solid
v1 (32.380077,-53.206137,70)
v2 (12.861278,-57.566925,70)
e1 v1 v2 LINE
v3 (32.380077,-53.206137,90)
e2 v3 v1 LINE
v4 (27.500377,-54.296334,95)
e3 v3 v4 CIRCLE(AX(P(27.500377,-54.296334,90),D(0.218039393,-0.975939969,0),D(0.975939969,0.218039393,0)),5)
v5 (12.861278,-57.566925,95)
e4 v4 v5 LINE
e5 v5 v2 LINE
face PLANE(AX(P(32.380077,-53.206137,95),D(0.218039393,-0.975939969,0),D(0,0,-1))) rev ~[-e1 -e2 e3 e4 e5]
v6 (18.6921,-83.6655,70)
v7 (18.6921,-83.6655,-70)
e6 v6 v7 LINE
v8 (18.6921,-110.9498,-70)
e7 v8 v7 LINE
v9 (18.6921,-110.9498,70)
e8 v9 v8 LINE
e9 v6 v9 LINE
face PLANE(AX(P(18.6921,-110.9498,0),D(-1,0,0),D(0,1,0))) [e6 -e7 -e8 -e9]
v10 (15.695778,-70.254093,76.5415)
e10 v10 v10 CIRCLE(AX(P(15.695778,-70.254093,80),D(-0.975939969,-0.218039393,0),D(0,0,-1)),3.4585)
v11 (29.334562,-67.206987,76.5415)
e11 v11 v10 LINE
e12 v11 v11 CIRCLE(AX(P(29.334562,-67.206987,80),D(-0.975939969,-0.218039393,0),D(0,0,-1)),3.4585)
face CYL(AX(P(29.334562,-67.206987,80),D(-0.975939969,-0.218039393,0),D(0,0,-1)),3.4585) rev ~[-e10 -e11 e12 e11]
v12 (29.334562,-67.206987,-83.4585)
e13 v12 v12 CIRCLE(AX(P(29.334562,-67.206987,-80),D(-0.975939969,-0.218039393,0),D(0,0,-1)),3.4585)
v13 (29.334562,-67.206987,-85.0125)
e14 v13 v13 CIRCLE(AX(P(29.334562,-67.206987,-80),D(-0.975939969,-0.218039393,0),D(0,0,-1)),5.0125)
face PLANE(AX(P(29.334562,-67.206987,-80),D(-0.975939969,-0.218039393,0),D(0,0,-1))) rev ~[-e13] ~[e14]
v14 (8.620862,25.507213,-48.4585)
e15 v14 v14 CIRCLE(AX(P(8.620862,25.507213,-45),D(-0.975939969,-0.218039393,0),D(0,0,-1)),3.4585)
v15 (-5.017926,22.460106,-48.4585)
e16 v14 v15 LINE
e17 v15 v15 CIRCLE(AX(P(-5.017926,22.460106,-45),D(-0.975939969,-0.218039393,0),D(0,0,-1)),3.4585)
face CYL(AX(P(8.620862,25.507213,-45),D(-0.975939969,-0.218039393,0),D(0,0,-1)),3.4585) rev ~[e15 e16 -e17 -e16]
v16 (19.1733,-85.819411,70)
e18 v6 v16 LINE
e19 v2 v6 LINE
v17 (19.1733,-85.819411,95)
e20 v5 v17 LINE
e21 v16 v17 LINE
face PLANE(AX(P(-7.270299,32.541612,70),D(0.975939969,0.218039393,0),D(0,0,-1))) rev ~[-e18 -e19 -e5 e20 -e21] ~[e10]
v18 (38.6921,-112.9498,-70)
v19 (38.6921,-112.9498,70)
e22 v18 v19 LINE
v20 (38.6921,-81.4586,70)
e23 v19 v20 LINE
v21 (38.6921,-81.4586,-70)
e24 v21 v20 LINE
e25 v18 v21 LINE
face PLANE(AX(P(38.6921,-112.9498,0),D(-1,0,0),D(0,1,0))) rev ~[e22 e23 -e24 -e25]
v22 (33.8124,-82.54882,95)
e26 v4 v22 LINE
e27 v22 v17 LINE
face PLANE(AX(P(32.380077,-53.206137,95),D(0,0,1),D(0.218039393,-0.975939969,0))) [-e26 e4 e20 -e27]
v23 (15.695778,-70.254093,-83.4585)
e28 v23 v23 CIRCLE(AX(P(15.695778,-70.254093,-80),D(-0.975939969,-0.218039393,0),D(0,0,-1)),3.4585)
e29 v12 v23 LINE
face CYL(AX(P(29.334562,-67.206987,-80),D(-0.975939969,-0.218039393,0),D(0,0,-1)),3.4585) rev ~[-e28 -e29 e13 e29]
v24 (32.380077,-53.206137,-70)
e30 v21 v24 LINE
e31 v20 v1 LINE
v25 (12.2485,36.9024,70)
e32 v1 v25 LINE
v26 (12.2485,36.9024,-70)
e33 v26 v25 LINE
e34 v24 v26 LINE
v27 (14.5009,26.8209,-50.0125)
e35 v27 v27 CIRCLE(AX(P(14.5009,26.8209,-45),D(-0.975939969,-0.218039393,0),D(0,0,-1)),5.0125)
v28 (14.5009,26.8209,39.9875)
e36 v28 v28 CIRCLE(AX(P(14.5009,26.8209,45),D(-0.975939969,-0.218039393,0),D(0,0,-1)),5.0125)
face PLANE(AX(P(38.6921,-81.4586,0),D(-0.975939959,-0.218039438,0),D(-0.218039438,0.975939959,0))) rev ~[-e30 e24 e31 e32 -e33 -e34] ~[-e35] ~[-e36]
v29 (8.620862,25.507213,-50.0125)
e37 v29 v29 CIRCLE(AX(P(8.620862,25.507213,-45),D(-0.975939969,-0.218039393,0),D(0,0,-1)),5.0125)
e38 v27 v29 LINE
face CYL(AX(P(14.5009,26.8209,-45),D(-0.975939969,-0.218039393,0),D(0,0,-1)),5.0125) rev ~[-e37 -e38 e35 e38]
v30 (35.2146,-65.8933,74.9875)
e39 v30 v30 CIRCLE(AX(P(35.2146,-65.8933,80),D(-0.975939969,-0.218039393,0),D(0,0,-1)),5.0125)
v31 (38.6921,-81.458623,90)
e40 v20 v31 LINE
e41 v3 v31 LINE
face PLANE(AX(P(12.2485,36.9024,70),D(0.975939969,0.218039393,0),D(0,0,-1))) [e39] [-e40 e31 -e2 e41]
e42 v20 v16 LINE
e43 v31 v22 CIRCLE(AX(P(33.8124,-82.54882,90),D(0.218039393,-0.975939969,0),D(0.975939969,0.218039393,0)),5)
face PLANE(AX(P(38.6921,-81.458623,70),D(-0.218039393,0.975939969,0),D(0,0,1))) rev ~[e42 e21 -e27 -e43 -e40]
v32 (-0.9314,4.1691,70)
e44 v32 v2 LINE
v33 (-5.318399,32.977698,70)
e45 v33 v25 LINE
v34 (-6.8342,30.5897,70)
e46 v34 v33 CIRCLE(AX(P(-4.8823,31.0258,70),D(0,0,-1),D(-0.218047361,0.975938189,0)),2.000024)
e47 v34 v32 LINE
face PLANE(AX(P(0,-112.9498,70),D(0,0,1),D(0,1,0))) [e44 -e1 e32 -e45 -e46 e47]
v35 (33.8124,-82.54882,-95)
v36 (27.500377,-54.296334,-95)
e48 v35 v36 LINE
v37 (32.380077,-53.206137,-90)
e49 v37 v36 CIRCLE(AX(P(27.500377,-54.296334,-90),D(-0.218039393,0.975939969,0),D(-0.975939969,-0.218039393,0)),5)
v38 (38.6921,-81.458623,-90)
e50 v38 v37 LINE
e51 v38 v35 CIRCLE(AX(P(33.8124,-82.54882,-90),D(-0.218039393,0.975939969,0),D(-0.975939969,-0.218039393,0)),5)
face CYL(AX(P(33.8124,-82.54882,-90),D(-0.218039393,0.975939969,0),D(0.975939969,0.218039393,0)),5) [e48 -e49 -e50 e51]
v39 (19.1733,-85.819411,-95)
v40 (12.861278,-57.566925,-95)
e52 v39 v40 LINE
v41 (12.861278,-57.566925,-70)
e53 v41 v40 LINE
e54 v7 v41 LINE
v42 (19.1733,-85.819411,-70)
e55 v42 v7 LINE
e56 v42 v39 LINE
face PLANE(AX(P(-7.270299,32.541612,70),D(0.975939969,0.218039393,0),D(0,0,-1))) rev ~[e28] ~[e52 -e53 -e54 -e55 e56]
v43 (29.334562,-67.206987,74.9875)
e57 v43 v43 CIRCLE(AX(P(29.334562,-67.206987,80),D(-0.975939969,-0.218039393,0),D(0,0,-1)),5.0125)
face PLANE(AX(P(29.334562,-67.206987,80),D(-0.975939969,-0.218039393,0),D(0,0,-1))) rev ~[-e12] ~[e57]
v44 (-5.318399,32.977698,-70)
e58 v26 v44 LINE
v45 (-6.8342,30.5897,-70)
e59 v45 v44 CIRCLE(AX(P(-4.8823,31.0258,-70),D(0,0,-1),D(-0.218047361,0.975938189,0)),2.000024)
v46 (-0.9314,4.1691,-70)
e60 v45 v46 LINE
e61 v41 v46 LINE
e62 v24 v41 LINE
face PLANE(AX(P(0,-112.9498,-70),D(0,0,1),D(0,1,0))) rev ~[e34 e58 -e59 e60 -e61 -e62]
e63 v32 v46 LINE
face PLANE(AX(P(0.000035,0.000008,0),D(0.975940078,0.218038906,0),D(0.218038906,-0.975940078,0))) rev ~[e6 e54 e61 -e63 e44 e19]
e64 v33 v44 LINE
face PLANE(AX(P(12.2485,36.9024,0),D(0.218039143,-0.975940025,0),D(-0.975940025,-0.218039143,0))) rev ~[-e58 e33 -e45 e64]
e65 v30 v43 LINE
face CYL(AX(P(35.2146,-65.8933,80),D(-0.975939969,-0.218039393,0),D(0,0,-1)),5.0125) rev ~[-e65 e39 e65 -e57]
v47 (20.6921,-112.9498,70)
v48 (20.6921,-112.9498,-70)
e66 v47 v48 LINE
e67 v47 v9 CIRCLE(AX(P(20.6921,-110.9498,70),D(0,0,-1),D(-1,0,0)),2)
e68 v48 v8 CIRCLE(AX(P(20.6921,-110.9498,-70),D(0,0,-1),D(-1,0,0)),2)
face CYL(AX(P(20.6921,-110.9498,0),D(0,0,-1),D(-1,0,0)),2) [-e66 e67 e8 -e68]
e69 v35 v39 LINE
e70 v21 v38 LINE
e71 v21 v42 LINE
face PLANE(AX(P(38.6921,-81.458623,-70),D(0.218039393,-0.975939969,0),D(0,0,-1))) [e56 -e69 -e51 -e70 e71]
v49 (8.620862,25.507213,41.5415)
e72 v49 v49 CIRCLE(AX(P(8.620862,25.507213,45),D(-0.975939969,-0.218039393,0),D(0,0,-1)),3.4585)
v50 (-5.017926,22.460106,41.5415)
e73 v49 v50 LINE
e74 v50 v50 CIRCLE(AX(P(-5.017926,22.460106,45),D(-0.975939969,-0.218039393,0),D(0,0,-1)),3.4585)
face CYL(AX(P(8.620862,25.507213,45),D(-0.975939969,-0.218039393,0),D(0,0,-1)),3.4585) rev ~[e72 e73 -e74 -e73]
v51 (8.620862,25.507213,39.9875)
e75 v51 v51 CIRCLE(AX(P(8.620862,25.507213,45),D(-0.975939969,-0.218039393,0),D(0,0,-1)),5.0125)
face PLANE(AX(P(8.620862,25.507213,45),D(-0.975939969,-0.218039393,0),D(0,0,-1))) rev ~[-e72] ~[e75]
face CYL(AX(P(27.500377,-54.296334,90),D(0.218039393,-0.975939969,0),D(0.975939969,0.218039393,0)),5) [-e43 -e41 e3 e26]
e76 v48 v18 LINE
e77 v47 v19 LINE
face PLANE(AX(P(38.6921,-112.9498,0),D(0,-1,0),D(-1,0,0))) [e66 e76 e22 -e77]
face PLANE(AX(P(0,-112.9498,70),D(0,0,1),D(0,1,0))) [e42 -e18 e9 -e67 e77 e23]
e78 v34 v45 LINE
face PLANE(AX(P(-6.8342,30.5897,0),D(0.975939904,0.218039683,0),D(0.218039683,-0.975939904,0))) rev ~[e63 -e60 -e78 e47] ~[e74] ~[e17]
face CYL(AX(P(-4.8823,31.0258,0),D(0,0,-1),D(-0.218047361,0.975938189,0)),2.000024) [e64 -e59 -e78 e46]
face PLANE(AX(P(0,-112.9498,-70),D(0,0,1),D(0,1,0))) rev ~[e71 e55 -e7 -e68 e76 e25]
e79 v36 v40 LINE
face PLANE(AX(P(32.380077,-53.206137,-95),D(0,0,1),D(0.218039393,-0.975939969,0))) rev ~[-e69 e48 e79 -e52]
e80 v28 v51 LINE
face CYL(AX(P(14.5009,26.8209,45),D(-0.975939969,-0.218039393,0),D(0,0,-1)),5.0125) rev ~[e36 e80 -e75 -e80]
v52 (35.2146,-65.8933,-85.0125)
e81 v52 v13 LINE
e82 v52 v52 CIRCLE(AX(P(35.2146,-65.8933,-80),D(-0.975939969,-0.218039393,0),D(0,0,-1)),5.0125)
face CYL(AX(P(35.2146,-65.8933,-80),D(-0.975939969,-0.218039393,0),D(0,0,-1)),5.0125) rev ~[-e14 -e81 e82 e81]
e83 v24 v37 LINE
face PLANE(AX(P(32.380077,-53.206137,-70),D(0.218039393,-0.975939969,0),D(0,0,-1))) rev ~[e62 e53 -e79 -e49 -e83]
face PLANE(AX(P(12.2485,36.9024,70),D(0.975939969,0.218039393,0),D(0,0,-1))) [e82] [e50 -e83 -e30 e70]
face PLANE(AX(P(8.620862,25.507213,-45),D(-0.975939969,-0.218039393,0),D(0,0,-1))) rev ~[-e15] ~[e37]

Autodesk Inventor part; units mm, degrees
ref_plane "YZ Plane" through (0, 0, 0) normal (1, 0, 0) x (0, 1, 0)
ref_plane "XZ Plane" through (0, 0, 0) normal (0, 1, 0) x (-1, 0, 0)
ref_plane "XY Plane" through (0, 0, 0) normal (0, 0, 1) x (1, 0, 0)
sketch "Sketch9" plane through (0, 0, 0) normal (0, 0, 1) x (1, 0, 0)
  line L0 (38.6921, -112.9498) -> (20.6921, -112.9498)
  arc A0 (18.6921, -110.9498) -> (20.6921, -112.9498) centre (20.6921, -110.9498) ccw
  line L1 (18.6921, -110.9498) -> (18.6921, -83.6655)
  line L2 (-0.9314, 4.1691) -> (18.6921, -83.6655)
  line L3 (-6.8342, 30.5897) -> (0, 0)
  arc A1 (-5.3184, 32.9777) -> (-6.8342, 30.5897) centre (-4.8823, 31.0258) ccw
  line L4 (12.2485, 36.9024) -> (-5.3184, 32.9777)
  line L5 (38.6921, -112.9498) -> (38.6921, -81.4586)
  line L6 (38.6921, -81.4586) -> (12.2485, 36.9024)
  point P0 (0, 0)
extrude "Extrusion8" add sketch "Sketch9" along normal mid plane 190
sketch "Sketch10" plane through (38.6921, -112.9498, 95) normal (1, 0, 0) x (0, 0, -1)
  point P0 (95, 112.9498)
sketch "Sketch11" plane through (0, 0, 0) normal (1, 0, 0) x (0, 1, 0)
  line L0 (-112.9498, 70) -> (-81.4586, 70)
  line L1 (-112.9498, -70) -> (-81.4586, -70)
  line L2 (-81.4586, -95) -> (-81.4586, 95) projected
  line L3 (-112.9498, 95) -> (-81.4586, 95) projected
  line L4 (-112.9498, -95) -> (-112.9498, 95) projected
  line L5 (-81.4586, -95) -> (-112.9498, -95) projected
  point P0 (0, 0)
  dimension "d39" = 140
  dimension "d40" = 70
extrude "Extrusion9" cut sketch "Sketch11" along normal through all both and the other way through all contours L4 L3 L2 L0 | L1 L2 L5 L4
sketch "Sketch12" plane through (12.2485, 36.9024, 95) normal (0.97594, 0.2180394, 0) x (0, 0, -1)
  line L0 (25, -121.279) -> (25, 0)
  line L1 (165, -121.279) -> (165, 0)
  line L2 (190, 0) -> (190, -121.279) projected
  line L3 (0, -121.279) -> (0, 0) projected
  line L4 (190, 0) -> (0, 0) projected
  line L5 (0, -121.279) -> (0, 0) projected
  line L6 (25, -121.279) -> (0, -121.279) projected
  line L7 (165, -121.279) -> (25, -121.279) projected
  line L8 (190, -121.279) -> (165, -121.279) projected
  line L9 (190, 0) -> (190, -121.279) projected
  point P0 (95, -33.3439)
  dimension "d44" = 25
  dimension "d45" = 25
  dimension "d46" = 140
extrude "Extrusion10" cut sketch "Sketch12" along normal through all both and the other way through all contours L6 L3 L4 L0 | L1 L4 L2 L8
sketch "Sketch13" plane through (12.2485, 36.9024, 70) normal (0.97594, 0.2180394, 0) x (0, 0, -1)
  line L0 (140, -152.0125) -> (0, -152.0125) projected
  line L1 (70, -152.0125) -> (70, -0.0751)
  circle A0 centre (115, -10.33) radius 3.4585
  circle A1 centre (25, -10.33) radius 3.4585
  circle A2 centre (-10, -105.33) radius 3.4585
  circle A3 centre (150, -105.33) radius 3.4585
  line L2 (0, 0) -> (140, 0)
  line L3 (0, 0) -> (0, -31.3439)
  line L4 (0, -31.3439) -> (12.5, -31.3439)
  line L5 (12.5, -31.3439) -> (12.5, -72.33)
  line L6 (12.5, -72.33) -> (0, -72.33)
  line L7 (0, -72.33) -> (0, -92.33)
  line L8 (-25, -92.33) -> (0, -92.33)
  ellipse E0 centre (2, -126.2447) end of major axis (2, -117.072) minor radius 2 (2, -117.072) -> (0.6988, -119.279) ccw
  line L9 (2, -117.072) -> (27.5, -117.072)
  line L10 (27.5, -27.072) -> (27.5, -117.072)
  line L11 (112.5, -27.072) -> (27.5, -27.072)
  line L12 (112.5, -117.072) -> (112.5, -27.072)
  line L13 (112.5, -117.072) -> (138, -117.072)
  ellipse E1 centre (138, -126.2447) end of major axis (138, -135.4173) minor radius 2 (139.3012, -119.279) -> (138, -117.072) ccw
  line L14 (165, -92.33) -> (165, -114.8107)
  line L15 (140, -92.33) -> (165, -92.33)
  line L16 (140, -92.33) -> (140, -72.33)
  line L17 (140, -72.33) -> (127.5, -72.33)
  line L18 (127.5, -72.33) -> (127.5, -31.3439)
  line L19 (127.5, -31.3439) -> (140, -31.3439)
  line L20 (140, -31.3439) -> (140, 0)
  line L21 (0, 0) -> (0, -121.279) projected
  line L22 (140, -121.279) -> (140, 0) projected
  line L23 (0, -121.279) -> (0, -152.0125) projected
  line L24 (0, -121.279) -> (-25, -121.279)
  line L25 (-25, -92.33) -> (-25, -121.279)
  line L26 (-25, -92.33) -> (7.4202, -92.33) construction
  line L27 (140, -121.279) -> (165, -121.279)
  line L28 (165, -92.33) -> (165, -121.279)
  point P0 (70, -33.3439)
  point P1 (-25.1048, -117.072)
  point P2 (-25, -119.279)
  point P3 (165, -119.279)
  dimension "d58" = 90
extrude "Extrusion11" add sketch "Sketch13" against normal up to surface (20 mm away) contours A2 | A3 | L8 L21 L24 L25 | L14 L28 L27 L22 L15
hole "Hole1" at (35.2146, -65.8933, -80) at (14.5009, 26.8209, -45) at (14.5009, 26.8209, 45) at (35.2146, -65.8933, 80) direction (-0.97594, -0.2180394, 0) diameter 6.917 depth 27.125 tip angle 118 counterbore diameter 10.025 counterbore depth 6.025 thread size "M8x1" class "6H" standard "ISO Metric profile"
fillet "Fillet3" radius 5 2 edges at (35.5361, -67.3324, 95) (35.5361, -67.3324, -95)
equation "\"d40\" = 0.5 * d39"
properties part number "Cover of robot upper base" material "Steel, Alloy"
